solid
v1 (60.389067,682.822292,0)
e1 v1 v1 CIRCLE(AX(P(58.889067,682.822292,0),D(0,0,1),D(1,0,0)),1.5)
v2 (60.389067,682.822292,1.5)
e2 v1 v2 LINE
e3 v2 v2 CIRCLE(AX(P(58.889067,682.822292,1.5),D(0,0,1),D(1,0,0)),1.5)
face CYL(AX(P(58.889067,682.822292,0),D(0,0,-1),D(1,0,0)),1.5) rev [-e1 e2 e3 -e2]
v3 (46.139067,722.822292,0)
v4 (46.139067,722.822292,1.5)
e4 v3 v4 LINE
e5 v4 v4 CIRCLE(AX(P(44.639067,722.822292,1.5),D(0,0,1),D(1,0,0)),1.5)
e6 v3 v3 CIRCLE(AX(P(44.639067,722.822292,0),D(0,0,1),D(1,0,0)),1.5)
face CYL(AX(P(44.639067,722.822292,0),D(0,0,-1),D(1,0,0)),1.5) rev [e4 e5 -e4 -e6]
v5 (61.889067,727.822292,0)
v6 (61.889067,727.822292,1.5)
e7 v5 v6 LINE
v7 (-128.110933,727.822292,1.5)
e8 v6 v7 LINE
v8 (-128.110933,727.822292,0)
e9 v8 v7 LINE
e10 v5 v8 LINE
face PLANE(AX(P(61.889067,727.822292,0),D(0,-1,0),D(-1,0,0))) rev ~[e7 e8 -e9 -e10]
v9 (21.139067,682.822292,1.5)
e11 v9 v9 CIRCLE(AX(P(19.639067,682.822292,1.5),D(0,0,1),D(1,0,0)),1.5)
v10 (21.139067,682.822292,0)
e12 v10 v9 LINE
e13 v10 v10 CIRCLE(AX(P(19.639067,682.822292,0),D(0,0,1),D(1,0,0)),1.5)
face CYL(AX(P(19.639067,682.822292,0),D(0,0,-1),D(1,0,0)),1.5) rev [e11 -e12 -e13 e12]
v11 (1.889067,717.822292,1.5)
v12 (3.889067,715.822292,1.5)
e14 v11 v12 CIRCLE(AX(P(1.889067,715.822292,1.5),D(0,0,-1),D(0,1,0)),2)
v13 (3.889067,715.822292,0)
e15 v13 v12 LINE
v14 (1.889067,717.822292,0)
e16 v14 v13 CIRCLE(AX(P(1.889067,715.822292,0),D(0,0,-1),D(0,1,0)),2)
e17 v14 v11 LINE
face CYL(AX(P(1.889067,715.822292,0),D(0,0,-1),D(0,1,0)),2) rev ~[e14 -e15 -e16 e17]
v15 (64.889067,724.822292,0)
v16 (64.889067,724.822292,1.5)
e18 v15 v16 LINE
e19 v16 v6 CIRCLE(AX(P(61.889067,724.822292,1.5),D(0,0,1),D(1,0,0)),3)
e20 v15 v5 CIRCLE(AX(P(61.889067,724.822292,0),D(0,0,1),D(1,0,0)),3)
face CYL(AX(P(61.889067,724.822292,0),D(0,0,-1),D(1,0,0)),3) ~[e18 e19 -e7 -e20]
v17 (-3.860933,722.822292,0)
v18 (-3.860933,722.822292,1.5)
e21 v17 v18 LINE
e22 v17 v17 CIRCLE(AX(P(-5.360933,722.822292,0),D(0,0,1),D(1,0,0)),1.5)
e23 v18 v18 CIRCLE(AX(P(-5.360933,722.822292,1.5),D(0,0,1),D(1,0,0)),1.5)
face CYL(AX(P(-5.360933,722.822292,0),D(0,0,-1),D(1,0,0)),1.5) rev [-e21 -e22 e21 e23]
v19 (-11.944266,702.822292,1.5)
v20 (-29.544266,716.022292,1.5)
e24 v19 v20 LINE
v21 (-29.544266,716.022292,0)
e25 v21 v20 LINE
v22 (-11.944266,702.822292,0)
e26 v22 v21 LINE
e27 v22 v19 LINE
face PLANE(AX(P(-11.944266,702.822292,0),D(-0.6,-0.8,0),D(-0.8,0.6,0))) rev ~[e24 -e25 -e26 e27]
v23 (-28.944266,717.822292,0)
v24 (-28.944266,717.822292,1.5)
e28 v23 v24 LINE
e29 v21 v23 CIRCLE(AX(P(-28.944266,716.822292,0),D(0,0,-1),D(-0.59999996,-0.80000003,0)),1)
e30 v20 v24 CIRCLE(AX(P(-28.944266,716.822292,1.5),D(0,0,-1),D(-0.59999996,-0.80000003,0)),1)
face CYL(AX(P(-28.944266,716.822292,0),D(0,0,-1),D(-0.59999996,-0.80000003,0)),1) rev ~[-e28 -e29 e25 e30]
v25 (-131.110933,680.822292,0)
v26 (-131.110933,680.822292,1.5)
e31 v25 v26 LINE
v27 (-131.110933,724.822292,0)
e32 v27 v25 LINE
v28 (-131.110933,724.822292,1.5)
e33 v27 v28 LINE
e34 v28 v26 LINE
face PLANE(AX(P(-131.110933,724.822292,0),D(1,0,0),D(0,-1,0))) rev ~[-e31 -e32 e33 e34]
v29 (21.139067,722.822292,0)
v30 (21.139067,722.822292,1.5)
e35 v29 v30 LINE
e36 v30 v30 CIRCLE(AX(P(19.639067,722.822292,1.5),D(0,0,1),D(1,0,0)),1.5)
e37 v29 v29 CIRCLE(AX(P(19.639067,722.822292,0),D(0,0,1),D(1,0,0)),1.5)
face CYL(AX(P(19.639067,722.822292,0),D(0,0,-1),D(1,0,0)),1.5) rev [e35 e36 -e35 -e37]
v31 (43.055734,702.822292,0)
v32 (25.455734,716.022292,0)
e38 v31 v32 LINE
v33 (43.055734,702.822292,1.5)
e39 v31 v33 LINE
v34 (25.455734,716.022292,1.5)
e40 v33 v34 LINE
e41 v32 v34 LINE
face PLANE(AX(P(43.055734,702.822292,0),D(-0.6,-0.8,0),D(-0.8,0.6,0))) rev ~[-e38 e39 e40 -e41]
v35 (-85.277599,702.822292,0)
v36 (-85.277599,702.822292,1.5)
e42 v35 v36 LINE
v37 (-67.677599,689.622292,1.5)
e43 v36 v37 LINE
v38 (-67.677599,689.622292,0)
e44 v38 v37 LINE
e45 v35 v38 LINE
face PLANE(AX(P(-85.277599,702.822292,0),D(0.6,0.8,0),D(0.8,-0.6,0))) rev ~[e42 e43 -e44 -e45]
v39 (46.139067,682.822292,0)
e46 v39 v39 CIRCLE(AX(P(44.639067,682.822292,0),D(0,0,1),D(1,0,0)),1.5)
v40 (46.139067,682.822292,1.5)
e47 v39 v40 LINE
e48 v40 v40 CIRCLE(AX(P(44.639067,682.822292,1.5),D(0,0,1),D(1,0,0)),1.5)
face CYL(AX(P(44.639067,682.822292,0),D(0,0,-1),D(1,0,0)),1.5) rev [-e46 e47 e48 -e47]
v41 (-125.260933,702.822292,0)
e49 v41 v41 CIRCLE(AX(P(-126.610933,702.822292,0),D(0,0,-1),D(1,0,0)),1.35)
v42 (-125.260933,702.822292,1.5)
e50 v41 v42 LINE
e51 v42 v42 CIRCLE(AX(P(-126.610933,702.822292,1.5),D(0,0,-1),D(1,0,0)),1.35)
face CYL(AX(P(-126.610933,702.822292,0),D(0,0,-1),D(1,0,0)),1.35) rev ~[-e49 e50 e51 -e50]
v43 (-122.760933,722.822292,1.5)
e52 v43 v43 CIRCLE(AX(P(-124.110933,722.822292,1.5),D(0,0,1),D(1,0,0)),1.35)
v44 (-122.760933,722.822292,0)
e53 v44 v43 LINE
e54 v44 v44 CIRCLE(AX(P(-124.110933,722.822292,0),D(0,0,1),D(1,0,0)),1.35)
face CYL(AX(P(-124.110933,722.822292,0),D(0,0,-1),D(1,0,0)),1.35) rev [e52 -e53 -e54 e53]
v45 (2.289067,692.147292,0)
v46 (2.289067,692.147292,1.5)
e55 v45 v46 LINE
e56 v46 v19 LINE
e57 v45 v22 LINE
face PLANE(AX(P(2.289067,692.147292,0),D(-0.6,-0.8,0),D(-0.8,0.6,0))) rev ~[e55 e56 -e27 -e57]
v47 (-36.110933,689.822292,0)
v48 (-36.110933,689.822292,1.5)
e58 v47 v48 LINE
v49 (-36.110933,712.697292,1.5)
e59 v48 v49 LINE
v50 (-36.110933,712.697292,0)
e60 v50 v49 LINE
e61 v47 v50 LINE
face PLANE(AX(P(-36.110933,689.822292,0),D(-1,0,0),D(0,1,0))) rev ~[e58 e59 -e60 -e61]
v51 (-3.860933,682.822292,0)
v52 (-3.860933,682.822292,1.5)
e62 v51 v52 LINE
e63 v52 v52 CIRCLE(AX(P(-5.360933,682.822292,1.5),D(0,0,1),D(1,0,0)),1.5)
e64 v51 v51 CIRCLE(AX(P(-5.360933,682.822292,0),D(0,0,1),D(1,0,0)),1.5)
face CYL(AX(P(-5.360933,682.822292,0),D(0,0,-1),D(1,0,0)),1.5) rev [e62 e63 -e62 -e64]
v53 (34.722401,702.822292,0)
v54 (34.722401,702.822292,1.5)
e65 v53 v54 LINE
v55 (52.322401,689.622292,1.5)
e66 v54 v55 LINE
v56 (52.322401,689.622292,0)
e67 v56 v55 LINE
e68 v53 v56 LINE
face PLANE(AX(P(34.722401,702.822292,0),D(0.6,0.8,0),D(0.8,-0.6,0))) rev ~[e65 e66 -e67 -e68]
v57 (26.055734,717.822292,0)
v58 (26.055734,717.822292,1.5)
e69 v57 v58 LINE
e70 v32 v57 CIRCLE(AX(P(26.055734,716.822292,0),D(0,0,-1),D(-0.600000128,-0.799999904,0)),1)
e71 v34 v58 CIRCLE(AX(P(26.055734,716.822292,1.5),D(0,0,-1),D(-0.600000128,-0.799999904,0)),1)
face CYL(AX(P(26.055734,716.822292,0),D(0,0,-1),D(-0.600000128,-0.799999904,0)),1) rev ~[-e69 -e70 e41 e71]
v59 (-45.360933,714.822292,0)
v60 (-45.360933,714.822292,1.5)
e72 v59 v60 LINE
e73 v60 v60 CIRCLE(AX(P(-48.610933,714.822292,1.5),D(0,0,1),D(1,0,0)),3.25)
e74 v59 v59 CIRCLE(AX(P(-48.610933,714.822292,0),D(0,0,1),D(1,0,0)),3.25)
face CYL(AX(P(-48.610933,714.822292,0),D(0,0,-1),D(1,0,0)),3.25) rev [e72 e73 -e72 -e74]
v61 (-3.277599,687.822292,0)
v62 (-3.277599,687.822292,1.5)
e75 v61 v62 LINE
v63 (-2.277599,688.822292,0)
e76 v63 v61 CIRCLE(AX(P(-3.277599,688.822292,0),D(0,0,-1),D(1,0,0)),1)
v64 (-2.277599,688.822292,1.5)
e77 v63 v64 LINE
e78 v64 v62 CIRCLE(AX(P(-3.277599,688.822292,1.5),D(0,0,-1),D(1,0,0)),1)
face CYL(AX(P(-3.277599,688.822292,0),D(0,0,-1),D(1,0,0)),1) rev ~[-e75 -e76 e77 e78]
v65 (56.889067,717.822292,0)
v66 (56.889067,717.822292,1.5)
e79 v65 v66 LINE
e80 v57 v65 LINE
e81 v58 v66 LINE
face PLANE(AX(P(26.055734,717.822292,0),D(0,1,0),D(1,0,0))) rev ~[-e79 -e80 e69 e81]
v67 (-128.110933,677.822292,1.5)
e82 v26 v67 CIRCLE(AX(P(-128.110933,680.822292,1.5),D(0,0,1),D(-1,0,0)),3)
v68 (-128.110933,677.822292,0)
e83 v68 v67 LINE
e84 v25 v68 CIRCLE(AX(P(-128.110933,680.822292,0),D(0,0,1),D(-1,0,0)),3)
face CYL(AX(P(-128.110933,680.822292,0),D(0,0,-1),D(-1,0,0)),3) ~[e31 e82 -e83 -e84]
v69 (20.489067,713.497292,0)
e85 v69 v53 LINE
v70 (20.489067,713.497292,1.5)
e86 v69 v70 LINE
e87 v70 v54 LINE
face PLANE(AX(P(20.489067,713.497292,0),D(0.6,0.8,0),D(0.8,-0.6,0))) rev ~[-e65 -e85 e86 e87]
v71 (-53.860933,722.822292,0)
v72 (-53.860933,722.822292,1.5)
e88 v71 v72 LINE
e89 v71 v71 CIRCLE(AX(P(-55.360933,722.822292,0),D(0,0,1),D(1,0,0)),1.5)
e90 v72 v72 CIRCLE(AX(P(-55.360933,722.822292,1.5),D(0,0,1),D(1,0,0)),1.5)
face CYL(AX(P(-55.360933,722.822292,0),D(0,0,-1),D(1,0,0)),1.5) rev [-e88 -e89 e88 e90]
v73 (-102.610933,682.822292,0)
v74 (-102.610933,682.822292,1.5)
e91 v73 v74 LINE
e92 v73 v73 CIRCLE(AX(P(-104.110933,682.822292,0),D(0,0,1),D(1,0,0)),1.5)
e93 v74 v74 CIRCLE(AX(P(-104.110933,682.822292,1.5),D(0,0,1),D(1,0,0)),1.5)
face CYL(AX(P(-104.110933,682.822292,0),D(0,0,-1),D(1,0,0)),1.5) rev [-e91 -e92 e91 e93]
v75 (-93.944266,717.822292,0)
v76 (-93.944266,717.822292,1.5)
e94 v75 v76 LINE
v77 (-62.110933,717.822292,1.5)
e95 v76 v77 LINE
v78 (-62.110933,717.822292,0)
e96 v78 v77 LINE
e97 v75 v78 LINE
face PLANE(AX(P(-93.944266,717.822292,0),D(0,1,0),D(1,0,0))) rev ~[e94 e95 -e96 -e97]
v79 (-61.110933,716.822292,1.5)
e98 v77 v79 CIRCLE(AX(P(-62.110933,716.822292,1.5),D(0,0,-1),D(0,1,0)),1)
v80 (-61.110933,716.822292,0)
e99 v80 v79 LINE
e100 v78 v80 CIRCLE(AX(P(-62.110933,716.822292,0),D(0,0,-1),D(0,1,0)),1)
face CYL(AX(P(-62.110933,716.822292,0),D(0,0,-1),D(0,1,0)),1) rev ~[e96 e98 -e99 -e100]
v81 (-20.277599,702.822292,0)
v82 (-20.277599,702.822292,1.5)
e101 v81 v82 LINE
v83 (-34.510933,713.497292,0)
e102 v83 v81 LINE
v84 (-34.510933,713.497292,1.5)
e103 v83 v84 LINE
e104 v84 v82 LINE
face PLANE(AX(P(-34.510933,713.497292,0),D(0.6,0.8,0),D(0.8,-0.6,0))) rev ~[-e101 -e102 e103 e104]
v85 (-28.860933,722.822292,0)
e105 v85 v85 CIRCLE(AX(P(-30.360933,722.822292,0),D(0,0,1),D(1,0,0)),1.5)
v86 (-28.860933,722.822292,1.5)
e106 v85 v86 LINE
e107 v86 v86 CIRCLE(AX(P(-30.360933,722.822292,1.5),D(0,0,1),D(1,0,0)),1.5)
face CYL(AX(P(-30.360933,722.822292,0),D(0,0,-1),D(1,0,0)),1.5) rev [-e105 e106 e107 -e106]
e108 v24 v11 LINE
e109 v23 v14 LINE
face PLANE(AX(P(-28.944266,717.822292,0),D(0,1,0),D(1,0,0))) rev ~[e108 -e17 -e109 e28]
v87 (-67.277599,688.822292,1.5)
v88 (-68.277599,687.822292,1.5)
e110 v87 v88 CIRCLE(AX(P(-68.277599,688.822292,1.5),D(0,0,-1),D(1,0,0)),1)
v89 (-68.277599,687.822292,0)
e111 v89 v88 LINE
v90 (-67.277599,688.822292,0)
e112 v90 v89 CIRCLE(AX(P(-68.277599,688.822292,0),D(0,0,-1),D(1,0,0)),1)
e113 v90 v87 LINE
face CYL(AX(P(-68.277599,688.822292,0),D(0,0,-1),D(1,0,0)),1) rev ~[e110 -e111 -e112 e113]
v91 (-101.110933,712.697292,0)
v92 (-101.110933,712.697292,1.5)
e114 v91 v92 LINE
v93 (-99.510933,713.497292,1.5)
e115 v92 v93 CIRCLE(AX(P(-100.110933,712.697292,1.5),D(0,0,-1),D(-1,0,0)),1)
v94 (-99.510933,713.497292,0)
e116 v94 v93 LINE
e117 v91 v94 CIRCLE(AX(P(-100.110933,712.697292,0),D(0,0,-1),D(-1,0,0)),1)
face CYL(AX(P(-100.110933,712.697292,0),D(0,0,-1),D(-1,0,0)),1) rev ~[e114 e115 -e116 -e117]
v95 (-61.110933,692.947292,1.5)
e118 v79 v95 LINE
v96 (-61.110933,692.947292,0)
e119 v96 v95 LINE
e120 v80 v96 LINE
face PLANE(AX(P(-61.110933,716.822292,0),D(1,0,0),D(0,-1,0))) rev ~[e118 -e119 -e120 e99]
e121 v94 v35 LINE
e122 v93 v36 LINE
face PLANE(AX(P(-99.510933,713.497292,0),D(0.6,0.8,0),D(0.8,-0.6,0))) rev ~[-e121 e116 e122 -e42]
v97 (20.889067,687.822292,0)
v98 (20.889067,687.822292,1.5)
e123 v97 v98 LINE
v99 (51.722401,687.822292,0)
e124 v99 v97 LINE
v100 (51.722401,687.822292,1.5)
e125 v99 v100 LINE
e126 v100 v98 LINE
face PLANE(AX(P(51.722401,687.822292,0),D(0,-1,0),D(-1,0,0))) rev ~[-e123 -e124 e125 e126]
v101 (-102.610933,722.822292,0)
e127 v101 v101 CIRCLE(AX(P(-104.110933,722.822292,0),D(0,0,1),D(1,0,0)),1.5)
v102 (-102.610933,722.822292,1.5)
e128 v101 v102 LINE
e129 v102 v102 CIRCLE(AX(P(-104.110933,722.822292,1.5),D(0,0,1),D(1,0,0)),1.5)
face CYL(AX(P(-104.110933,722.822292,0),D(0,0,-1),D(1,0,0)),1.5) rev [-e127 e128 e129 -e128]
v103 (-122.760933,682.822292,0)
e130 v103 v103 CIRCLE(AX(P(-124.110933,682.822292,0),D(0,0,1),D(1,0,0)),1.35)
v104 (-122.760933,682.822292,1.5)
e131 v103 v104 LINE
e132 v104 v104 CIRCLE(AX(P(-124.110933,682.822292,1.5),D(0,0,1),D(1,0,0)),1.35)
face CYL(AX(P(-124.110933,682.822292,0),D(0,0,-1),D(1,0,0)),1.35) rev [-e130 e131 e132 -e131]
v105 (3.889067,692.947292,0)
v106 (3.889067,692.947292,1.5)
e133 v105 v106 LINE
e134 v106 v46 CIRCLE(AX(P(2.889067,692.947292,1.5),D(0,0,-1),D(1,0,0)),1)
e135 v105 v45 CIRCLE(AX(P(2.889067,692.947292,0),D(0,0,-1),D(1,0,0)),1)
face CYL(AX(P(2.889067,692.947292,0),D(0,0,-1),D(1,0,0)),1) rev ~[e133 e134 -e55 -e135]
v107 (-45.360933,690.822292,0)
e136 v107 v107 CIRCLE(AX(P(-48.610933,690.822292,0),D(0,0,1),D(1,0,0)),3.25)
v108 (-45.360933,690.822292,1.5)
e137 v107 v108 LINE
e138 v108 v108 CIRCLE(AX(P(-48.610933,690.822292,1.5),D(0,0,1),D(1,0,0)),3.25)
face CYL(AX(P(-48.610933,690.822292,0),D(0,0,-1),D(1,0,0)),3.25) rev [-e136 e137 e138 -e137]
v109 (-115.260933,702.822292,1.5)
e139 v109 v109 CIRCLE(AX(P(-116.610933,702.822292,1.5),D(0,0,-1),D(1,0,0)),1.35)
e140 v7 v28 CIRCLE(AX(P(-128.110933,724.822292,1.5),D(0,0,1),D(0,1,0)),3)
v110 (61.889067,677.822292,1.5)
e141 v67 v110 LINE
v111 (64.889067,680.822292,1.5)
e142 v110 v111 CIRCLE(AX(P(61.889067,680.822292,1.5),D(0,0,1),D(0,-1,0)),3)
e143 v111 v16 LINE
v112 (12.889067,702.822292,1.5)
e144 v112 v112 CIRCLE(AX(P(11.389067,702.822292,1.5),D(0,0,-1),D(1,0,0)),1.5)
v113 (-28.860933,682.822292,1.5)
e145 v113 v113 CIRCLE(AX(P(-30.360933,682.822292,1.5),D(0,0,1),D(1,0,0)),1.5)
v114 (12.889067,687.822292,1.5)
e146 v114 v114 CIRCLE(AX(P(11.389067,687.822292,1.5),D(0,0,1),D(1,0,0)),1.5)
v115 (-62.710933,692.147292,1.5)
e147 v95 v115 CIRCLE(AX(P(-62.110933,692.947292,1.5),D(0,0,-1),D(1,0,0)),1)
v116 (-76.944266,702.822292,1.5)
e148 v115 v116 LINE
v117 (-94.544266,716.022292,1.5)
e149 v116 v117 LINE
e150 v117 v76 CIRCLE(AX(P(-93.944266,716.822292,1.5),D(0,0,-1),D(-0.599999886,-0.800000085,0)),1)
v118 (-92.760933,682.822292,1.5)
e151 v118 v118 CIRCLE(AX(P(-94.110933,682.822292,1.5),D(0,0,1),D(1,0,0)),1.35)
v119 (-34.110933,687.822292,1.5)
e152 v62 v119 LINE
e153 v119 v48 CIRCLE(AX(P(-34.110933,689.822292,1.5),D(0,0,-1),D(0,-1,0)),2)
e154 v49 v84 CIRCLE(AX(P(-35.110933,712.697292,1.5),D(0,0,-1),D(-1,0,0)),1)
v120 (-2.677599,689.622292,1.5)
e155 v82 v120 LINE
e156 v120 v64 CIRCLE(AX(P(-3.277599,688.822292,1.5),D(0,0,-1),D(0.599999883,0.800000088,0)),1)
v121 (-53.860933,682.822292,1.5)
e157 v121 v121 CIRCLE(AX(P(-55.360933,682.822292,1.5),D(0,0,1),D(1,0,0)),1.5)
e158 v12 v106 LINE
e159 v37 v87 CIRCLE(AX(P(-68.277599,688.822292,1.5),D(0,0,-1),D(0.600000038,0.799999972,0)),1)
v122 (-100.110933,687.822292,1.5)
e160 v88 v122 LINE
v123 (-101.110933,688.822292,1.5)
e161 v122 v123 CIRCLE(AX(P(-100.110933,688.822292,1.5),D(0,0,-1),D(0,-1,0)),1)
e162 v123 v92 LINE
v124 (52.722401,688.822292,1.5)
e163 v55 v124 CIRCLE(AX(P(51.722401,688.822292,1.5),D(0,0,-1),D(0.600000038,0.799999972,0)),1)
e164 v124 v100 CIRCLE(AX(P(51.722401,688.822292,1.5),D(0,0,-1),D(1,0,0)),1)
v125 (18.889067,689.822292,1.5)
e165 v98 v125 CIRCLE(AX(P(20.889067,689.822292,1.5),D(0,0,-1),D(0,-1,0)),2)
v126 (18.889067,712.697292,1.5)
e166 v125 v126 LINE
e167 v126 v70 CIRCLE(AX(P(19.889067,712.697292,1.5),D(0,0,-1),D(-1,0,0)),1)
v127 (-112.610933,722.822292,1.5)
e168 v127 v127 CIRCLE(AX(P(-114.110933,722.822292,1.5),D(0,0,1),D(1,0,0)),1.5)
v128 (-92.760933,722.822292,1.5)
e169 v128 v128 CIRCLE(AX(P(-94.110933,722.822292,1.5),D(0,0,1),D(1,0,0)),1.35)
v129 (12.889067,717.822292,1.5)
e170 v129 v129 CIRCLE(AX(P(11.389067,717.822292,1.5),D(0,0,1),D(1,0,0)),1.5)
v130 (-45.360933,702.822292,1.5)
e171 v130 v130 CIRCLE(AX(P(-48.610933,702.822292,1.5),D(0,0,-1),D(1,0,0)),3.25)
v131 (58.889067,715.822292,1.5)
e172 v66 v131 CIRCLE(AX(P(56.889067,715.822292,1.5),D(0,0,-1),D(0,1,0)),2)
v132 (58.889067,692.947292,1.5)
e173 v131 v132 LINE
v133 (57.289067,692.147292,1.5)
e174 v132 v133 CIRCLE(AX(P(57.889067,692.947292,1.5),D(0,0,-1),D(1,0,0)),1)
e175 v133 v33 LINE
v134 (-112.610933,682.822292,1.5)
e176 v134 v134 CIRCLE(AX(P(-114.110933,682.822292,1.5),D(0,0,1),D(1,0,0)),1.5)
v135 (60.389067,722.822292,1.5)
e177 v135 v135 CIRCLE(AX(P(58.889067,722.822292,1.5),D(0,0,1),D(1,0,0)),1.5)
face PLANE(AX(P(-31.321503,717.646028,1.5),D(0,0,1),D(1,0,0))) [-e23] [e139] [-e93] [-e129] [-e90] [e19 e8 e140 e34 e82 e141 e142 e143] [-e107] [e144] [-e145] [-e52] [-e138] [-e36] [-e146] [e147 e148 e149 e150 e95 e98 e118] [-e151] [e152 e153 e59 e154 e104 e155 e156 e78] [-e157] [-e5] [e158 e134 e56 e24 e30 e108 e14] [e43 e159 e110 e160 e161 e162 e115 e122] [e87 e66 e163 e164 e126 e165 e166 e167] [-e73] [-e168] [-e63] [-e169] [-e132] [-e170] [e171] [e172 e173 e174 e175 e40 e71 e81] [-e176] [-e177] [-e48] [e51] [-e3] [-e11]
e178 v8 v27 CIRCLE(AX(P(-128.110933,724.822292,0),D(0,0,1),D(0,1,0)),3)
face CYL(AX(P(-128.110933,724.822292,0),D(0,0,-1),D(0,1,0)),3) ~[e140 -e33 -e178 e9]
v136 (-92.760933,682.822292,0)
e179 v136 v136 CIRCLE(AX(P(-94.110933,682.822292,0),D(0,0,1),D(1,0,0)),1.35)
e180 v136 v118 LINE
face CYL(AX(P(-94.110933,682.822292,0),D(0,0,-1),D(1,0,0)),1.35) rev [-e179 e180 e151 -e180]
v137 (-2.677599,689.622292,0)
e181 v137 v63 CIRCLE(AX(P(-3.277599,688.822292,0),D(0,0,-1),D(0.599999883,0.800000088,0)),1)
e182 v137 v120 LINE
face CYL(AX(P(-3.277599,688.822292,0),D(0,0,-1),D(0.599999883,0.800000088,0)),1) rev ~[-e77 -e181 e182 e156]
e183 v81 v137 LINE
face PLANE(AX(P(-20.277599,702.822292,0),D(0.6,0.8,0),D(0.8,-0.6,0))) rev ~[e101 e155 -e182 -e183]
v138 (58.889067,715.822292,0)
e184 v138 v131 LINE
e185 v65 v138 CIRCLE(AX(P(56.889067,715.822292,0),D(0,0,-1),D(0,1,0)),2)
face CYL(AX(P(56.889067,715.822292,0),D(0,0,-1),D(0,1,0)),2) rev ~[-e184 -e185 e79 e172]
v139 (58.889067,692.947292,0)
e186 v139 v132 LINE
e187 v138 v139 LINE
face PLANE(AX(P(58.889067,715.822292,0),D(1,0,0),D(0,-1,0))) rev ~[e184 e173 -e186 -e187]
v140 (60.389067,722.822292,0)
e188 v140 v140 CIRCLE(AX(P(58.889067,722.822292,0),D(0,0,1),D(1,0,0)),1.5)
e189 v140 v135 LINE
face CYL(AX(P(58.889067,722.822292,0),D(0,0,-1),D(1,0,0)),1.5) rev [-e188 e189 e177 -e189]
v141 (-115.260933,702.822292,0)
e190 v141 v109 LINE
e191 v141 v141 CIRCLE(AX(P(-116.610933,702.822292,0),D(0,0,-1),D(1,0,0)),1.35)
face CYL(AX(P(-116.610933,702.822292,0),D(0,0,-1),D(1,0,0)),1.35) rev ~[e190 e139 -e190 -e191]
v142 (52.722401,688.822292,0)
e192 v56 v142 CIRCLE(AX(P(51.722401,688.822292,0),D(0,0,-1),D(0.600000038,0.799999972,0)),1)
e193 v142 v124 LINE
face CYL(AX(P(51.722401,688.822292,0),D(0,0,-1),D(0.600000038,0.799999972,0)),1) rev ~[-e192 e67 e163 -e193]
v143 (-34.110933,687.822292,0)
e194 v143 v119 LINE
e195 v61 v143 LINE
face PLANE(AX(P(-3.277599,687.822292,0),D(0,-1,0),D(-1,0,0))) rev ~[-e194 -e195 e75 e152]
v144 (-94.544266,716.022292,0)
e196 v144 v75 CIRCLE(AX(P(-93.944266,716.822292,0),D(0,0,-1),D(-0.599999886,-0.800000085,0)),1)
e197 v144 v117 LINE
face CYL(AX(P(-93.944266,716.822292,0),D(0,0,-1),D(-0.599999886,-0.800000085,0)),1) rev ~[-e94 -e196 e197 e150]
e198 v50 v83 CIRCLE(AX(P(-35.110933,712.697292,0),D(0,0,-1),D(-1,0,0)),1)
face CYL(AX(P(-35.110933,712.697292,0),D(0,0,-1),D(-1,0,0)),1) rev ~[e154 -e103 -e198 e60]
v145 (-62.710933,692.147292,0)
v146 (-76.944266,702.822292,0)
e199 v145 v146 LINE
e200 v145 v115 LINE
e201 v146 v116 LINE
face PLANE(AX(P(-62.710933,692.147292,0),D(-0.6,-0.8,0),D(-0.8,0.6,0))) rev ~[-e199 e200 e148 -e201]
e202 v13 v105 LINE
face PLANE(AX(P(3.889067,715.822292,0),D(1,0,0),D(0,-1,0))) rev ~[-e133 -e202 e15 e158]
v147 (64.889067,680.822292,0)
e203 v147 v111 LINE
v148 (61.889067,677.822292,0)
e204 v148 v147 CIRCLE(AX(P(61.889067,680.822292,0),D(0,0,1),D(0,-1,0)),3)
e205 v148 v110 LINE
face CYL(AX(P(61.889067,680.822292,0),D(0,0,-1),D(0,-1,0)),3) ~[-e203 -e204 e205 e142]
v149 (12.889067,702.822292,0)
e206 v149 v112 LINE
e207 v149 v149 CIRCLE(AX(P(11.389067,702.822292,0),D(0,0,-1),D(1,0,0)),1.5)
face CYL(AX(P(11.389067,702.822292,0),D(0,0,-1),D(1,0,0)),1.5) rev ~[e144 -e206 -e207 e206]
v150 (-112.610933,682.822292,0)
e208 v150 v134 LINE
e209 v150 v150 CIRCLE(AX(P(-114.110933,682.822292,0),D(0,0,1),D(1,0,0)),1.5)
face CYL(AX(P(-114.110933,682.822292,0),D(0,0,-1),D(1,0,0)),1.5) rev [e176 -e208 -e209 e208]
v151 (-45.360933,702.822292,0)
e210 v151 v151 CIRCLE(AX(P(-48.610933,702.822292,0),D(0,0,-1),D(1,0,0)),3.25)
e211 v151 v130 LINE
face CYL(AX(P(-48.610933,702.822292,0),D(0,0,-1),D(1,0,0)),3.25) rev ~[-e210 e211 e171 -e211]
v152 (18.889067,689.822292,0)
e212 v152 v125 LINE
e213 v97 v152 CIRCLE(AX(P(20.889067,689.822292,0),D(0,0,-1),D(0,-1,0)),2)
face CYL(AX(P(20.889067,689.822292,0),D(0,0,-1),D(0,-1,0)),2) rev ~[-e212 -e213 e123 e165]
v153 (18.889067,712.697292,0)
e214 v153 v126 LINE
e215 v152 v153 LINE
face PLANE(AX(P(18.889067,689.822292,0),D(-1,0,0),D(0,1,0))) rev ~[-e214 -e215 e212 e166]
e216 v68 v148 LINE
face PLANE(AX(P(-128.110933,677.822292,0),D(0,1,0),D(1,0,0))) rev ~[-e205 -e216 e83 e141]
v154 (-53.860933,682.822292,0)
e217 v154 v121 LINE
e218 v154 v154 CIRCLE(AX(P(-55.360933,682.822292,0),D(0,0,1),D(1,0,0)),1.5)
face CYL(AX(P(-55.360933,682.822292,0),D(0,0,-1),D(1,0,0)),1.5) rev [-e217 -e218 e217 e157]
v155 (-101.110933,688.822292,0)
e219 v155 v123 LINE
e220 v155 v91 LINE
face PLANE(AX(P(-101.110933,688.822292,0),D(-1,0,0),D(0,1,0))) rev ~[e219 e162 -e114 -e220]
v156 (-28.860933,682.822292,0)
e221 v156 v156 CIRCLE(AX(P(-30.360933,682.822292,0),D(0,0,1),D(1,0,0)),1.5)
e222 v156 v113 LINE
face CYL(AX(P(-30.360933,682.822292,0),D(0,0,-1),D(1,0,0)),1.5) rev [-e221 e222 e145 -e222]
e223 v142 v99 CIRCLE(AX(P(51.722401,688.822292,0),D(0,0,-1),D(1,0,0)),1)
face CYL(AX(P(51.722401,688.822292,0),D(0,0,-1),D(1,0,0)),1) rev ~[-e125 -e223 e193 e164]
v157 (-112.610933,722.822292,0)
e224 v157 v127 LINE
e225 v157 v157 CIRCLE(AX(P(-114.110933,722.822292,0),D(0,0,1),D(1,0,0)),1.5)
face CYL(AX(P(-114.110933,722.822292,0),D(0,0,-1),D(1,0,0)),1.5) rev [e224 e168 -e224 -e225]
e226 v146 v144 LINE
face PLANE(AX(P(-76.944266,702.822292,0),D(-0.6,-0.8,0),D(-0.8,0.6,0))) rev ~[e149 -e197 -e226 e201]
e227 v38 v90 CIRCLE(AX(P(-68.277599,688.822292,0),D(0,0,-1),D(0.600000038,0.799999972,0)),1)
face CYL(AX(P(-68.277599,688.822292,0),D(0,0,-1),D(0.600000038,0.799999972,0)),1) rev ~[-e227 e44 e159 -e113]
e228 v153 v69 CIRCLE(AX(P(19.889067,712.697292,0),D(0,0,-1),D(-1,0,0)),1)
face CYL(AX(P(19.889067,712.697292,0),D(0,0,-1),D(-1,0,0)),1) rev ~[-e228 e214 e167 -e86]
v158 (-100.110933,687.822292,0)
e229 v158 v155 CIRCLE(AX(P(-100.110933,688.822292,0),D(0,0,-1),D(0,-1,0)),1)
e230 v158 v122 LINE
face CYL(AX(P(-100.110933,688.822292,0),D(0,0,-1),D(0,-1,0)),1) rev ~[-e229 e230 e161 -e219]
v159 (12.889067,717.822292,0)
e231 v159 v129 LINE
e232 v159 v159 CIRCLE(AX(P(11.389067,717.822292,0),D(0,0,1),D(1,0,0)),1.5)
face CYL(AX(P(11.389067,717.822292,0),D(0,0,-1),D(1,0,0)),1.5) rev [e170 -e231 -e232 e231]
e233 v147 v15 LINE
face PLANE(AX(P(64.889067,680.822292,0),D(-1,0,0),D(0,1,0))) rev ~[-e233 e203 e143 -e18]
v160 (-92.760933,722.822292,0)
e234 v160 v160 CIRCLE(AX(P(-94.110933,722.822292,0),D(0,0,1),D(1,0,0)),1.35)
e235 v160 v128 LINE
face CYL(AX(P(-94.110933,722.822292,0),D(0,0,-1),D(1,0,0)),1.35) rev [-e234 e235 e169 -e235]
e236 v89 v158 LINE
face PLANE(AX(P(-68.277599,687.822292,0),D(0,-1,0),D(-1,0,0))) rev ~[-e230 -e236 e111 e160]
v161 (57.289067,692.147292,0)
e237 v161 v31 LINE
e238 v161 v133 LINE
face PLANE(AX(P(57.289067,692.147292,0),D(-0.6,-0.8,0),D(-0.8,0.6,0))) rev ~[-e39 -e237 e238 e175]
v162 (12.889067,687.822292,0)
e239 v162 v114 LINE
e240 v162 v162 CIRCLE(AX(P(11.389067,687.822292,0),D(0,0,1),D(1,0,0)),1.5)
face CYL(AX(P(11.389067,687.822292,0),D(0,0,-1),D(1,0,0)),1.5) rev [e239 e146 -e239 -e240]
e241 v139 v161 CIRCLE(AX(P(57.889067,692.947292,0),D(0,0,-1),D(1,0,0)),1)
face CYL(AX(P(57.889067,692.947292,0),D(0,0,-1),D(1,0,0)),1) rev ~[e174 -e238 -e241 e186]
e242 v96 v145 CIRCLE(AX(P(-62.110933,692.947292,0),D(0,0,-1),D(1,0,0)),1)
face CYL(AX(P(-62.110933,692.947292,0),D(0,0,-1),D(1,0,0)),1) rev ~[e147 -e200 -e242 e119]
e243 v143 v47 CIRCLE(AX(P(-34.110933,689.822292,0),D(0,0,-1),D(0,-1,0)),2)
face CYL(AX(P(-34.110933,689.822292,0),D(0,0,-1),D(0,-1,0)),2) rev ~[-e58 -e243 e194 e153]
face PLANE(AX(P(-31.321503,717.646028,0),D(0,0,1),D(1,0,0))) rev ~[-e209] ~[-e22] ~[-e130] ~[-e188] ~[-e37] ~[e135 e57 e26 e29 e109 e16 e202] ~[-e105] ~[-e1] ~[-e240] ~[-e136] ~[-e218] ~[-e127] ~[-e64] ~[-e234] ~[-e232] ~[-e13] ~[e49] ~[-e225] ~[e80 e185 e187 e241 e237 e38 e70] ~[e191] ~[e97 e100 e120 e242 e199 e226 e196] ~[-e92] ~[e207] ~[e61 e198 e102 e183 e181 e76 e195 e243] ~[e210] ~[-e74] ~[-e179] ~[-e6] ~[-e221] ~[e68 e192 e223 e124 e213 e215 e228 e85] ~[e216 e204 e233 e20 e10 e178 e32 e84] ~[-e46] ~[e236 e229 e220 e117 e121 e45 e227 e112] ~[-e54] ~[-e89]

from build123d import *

# Parameters (mm, degrees)
F0_R     = 3.25
F0_R_2   = 1.35
F0_R_3   = 1.5
F1_DEPTH = 1.5


# Not quite as in the source:
# - a feature names something its author has since deleted; it is built from what else it names


with BuildPart() as f1:
    # F0 (on Top) → F1 (new body)
    with BuildSketch(Plane.XY):
        with BuildLine():
            Line((61.8890674149, 727.822291851), (-128.1109325851, 727.822291851))
            ThreePointArc((-128.1109325851, 727.822291851), (-130.2322529287, 726.9436121946), (-131.1109325851, 724.822291851))
            Line((-131.1109325851, 724.822291851), (-131.1109325851, 702.822291851))
            Line((-131.1109325851, 702.822291851), (-127.9609325851, 702.822291851))
            ThreePointArc((-127.9609325851, 702.822291851), (-126.6109325851, 704.172291851), (-125.2609325851, 702.822291851))
            Line((-125.2609325851, 702.822291851), (-117.9609325851, 702.822291851))
            ThreePointArc((-117.9609325851, 702.822291851), (-116.6109325851, 704.172291851), (-115.2609325851, 702.822291851))
            Line((-115.2609325851, 702.822291851), (-101.1109325851, 702.822291851))
            Line((-101.1109325851, 702.822291851), (-101.1109325851, 712.697291851))
            Line((-101.1109325851, 712.697291851), (-101.1109325851, 714.697291851))
            Line((-101.1109325851, 714.697291851), (-101.1109325851, 714.822291851))
            ThreePointArc((-101.1109325851, 714.822291851), (-100.8472193445, 716.0522246827), (-100.1024427382, 717.0659244658))
            ThreePointArc((-100.1024427382, 717.0659244658), (-99.1760856623, 717.6268326195), (-98.1109325851, 717.822291851))
            Line((-98.1109325851, 717.822291851), (-96.9442659185, 717.822291851))
            Line((-96.9442659185, 717.822291851), (-93.9442659185, 717.822291851))
            Line((-93.9442659185, 717.822291851), (-62.1109325851, 717.822291851))
            ThreePointArc((-62.1109325851, 717.822291851), (-61.403825804, 717.5293986322), (-61.1109325851, 716.822291851))
            Line((-61.1109325851, 716.822291851), (-61.1109325851, 702.822291851))
            Line((-61.1109325851, 702.822291851), (-51.8609325851, 702.822291851))
            ThreePointArc((-51.8609325851, 702.822291851), (-48.6109325851, 706.072291851), (-45.3609325851, 702.822291851))
            Line((-45.3609325851, 702.822291851), (-36.1109325851, 702.822291851))
            Line((-36.1109325851, 702.822291851), (-36.1109325851, 712.697291851))
            Line((-36.1109325851, 712.697291851), (-36.1109325851, 714.697291851))
            Line((-36.1109325851, 714.697291851), (-36.1109325851, 715.822291851))
            ThreePointArc((-36.1109325851, 715.822291851), (-35.9351237581, 716.6422470721), (-35.4386060205, 717.3180469276))
            ThreePointArc((-35.4386060205, 717.3180469276), (-34.8210346366, 717.6919856967), (-34.1109325851, 717.822291851))
            Line((-34.1109325851, 717.822291851), (-31.9442659185, 717.822291851))
            Line((-31.9442659185, 717.822291851), (-28.9442659185, 717.822291851))
            Line((-28.9442659185, 717.822291851), (1.8890674149, 717.822291851))
            ThreePointArc((1.8890674149, 717.822291851), (3.3032809772, 717.2365054134), (3.8890674149, 715.822291851))
            Line((3.8890674149, 715.822291851), (3.8890674149, 702.822291851))
            Line((3.8890674149, 702.822291851), (9.8890674149, 702.822291851))
            ThreePointArc((9.8890674149, 702.822291851), (11.3890674149, 704.322291851), (12.8890674149, 702.822291851))
            Line((12.8890674149, 702.822291851), (18.8890674149, 702.822291851))
            Line((18.8890674149, 702.822291851), (18.8890674149, 712.697291851))
            Line((18.8890674149, 712.697291851), (18.8890674149, 714.697291851))
            Line((18.8890674149, 714.697291851), (18.8890674149, 715.822291851))
            ThreePointArc((18.8890674149, 715.822291851), (19.0648762419, 716.6422470721), (19.5613939795, 717.3180469276))
            ThreePointArc((19.5613939795, 717.3180469276), (20.1789653634, 717.6919856967), (20.8890674149, 717.822291851))
            Line((20.8890674149, 717.822291851), (23.0557340815, 717.822291851))
            Line((23.0557340815, 717.822291851), (26.0557340815, 717.822291851))
            Line((26.0557340815, 717.822291851), (56.8890674149, 717.822291851))
            ThreePointArc((56.8890674149, 717.822291851), (58.3032809772, 717.2365054134), (58.8890674149, 715.822291851))
            Line((58.8890674149, 715.822291851), (58.8890674149, 702.822291851))
            Line((58.8890674149, 702.822291851), (64.8890674149, 702.822291851))
            Line((64.8890674149, 702.822291851), (64.8890674149, 724.822291851))
            ThreePointArc((64.8890674149, 724.822291851), (64.0103877584, 726.9436121946), (61.8890674149, 727.822291851))
        make_face()
        with Locations((-48.6109325851, 714.822291851)):
            Circle(F0_R, mode=Mode.SUBTRACT)
        with Locations((-124.1109325851, 722.822291851)):
            Circle(F0_R_2, mode=Mode.SUBTRACT)
        with Locations((-114.1109325851, 722.822291851)):
            Circle(F0_R_3, mode=Mode.SUBTRACT)
        with Locations((-104.1109325851, 722.822291851)):
            Circle(F0_R_3, mode=Mode.SUBTRACT)
        with Locations((-94.1109325851, 722.822291851)):
            Circle(F0_R_2, mode=Mode.SUBTRACT)
        with Locations((-55.3609325851, 722.822291851)):
            Circle(F0_R_3, mode=Mode.SUBTRACT)
        with Locations((11.3890674149, 717.822291851)):
            Circle(F0_R_3, mode=Mode.SUBTRACT)
        with Locations((-30.3609325851, 722.822291851)):
            Circle(F0_R_3, mode=Mode.SUBTRACT)
        with Locations((-5.3609325851, 722.822291851)):
            Circle(F0_R_3, mode=Mode.SUBTRACT)
        with Locations((19.6390674149, 722.822291851)):
            Circle(F0_R_3, mode=Mode.SUBTRACT)
        with Locations((23.8890674149, 722.822291851)):
            Circle(F0_R_3, mode=Mode.SUBTRACT)
        with Locations((44.6390674149, 722.822291851)):
            Circle(F0_R_3, mode=Mode.SUBTRACT)
        with Locations((58.8890674149, 722.822291851)):
            Circle(F0_R_3, mode=Mode.SUBTRACT)
        with BuildLine():
            Line((-127.9609325851, 702.822291851), (-131.1109325851, 702.822291851))
            Line((-131.1109325851, 702.822291851), (-131.1109325851, 680.822291851))
            ThreePointArc((-131.1109325851, 680.822291851), (-130.2322529287, 678.7009715075), (-128.1109325851, 677.822291851))
            Line((-128.1109325851, 677.822291851), (61.8890674149, 677.822291851))
            ThreePointArc((61.8890674149, 677.822291851), (64.0103877584, 678.7009715075), (64.8890674149, 680.822291851))
            Line((64.8890674149, 680.822291851), (64.8890674149, 702.822291851))
            Line((64.8890674149, 702.822291851), (58.8890674149, 702.822291851))
            Line((58.8890674149, 702.822291851), (58.8890674149, 692.947291851))
            Line((58.8890674149, 692.947291851), (58.8890674149, 690.947291851))
            Line((58.8890674149, 690.947291851), (58.8890674149, 689.822291851))
            ThreePointArc((58.8890674149, 689.822291851), (58.7132585878, 689.0023366299), (58.2167408502, 688.3265367745))
            ThreePointArc((58.2167408502, 688.3265367745), (57.5991694663, 687.9525980054), (56.8890674149, 687.822291851))
            Line((56.8890674149, 687.822291851), (54.7224007482, 687.822291851))
            Line((54.7224007482, 687.822291851), (51.7224007482, 687.822291851))
            Line((51.7224007482, 687.822291851), (20.8890674149, 687.822291851))
            ThreePointArc((20.8890674149, 687.822291851), (19.4748538525, 688.4080782887), (18.8890674149, 689.822291851))
            Line((18.8890674149, 689.822291851), (18.8890674149, 702.822291851))
            Line((18.8890674149, 702.822291851), (12.8890674149, 702.822291851))
            ThreePointArc((12.8890674149, 702.822291851), (11.3890674149, 701.322291851), (9.8890674149, 702.822291851))
            Line((9.8890674149, 702.822291851), (3.8890674149, 702.822291851))
            Line((3.8890674149, 702.822291851), (3.8890674149, 692.947291851))
            Line((3.8890674149, 692.947291851), (3.8890674149, 690.947291851))
            Line((3.8890674149, 690.947291851), (3.8890674149, 689.822291851))
            ThreePointArc((3.8890674149, 689.822291851), (3.7132585878, 689.0023366299), (3.2167408502, 688.3265367745))
            ThreePointArc((3.2167408502, 688.3265367745), (2.5991694663, 687.9525980054), (1.8890674149, 687.822291851))
            Line((1.8890674149, 687.822291851), (-0.2775992518, 687.822291851))
            Line((-0.2775992518, 687.822291851), (-3.2775992518, 687.822291851))
            Line((-3.2775992518, 687.822291851), (-34.1109325851, 687.822291851))
            ThreePointArc((-34.1109325851, 687.822291851), (-35.5251461475, 688.4080782887), (-36.1109325851, 689.822291851))
            Line((-36.1109325851, 689.822291851), (-36.1109325851, 702.822291851))
            Line((-36.1109325851, 702.822291851), (-45.3609325851, 702.822291851))
            ThreePointArc((-45.3609325851, 702.822291851), (-48.6109325851, 699.572291851), (-51.8609325851, 702.822291851))
            Line((-51.8609325851, 702.822291851), (-61.1109325851, 702.822291851))
            Line((-61.1109325851, 702.822291851), (-61.1109325851, 692.947291851))
            Line((-61.1109325851, 692.947291851), (-61.1109325851, 690.947291851))
            Line((-61.1109325851, 690.947291851), (-61.1109325851, 690.822291851))
            ThreePointArc((-61.1109325851, 690.822291851), (-61.3746458258, 689.5923590194), (-62.1194224321, 688.5786592362))
            ThreePointArc((-62.1194224321, 688.5786592362), (-63.045779508, 688.0177510825), (-64.1109325851, 687.822291851))
            Line((-64.1109325851, 687.822291851), (-65.2775992518, 687.822291851))
            Line((-65.2775992518, 687.822291851), (-68.2775992518, 687.822291851))
            Line((-68.2775992518, 687.822291851), (-100.1109325851, 687.822291851))
            ThreePointArc((-100.1109325851, 687.822291851), (-100.8180393663, 688.1151850699), (-101.1109325851, 688.822291851))
            Line((-101.1109325851, 688.822291851), (-101.1109325851, 702.822291851))
            Line((-101.1109325851, 702.822291851), (-115.2609325851, 702.822291851))
            ThreePointArc((-115.2609325851, 702.822291851), (-116.6109325851, 701.472291851), (-117.9609325851, 702.822291851))
            Line((-117.9609325851, 702.822291851), (-125.2609325851, 702.822291851))
            ThreePointArc((-125.2609325851, 702.822291851), (-126.6109325851, 701.472291851), (-127.9609325851, 702.822291851))
        make_face()
        with Locations((-124.1109325851, 682.822291851)):
            Circle(F0_R_2, mode=Mode.SUBTRACT)
        with Locations((-114.1109325851, 682.822291851)):
            Circle(F0_R_3, mode=Mode.SUBTRACT)
        with Locations((-104.1109325851, 682.822291851)):
            Circle(F0_R_3, mode=Mode.SUBTRACT)
        with Locations((-94.1109325851, 682.822291851)):
            Circle(F0_R_2, mode=Mode.SUBTRACT)
        with Locations((-55.3609325851, 682.822291851)):
            Circle(F0_R_3, mode=Mode.SUBTRACT)
        with Locations((-48.6109325851, 690.822291851)):
            Circle(F0_R, mode=Mode.SUBTRACT)
        with Locations((-30.3609325851, 682.822291851)):
            Circle(F0_R_3, mode=Mode.SUBTRACT)
        with Locations((-5.3609325851, 682.822291851)):
            Circle(F0_R_3, mode=Mode.SUBTRACT)
        with Locations((11.3890674149, 687.822291851)):
            Circle(F0_R_3, mode=Mode.SUBTRACT)
        with Locations((19.6390674149, 682.822291851)):
            Circle(F0_R_3, mode=Mode.SUBTRACT)
        with Locations((23.8890674149, 682.822291851)):
            Circle(F0_R_3, mode=Mode.SUBTRACT)
        with Locations((44.6390674149, 682.822291851)):
            Circle(F0_R_3, mode=Mode.SUBTRACT)
        with Locations((58.8890674149, 682.822291851)):
            Circle(F0_R_3, mode=Mode.SUBTRACT)
        with Locations((23.8890674149, 722.822291851)):
            Circle(F0_R_3)
        with Locations((23.8890674149, 682.822291851)):
            Circle(F0_R_3)
        with BuildLine():
            Line((-99.5109326053, 713.4972918661), (-85.2775992518, 702.822291851))
            Line((-85.2775992518, 702.822291851), (-81.1109325851, 702.822291851))
            Line((-81.1109325851, 702.822291851), (-100.1024427382, 717.0659244658))
            ThreePointArc((-100.1024427382, 717.0659244658), (-100.8472193445, 716.0522246827), (-101.1109325851, 714.822291851))
            Line((-101.1109325851, 714.822291851), (-101.1109325851, 714.697291851))
            Line((-101.1109325851, 714.697291851), (-99.5109326053, 713.4972918661))
        make_face()
        with BuildLine():
            Line((-100.1024427382, 717.0659244658), (-81.1109325851, 702.822291851))
            Line((-81.1109325851, 702.822291851), (-76.9442659185, 702.822291851))
            Line((-76.9442659185, 702.822291851), (-94.5442658047, 716.0222917657))
            Line((-94.5442658047, 716.0222917657), (-96.9442659185, 717.822291851))
            Line((-96.9442659185, 717.822291851), (-98.1109325851, 717.822291851))
            ThreePointArc((-98.1109325851, 717.822291851), (-99.1760856623, 717.6268326195), (-100.1024427382, 717.0659244658))
        make_face()
        with BuildLine():
            Line((-76.9442659185, 702.822291851), (-81.1109325851, 702.822291851))
            Line((-81.1109325851, 702.822291851), (-62.1194224321, 688.5786592362))
            ThreePointArc((-62.1194224321, 688.5786592362), (-61.3746458258, 689.5923590194), (-61.1109325851, 690.822291851))
            Line((-61.1109325851, 690.822291851), (-61.1109325851, 690.947291851))
            Line((-61.1109325851, 690.947291851), (-62.7109326177, 692.1472918754))
            Line((-62.7109326177, 692.1472918754), (-76.9442659185, 702.822291851))
        make_face()
        with BuildLine():
            Line((-81.1109325851, 702.822291851), (-85.2775992518, 702.822291851))
            Line((-85.2775992518, 702.822291851), (-67.6775992141, 689.6222918227))
            Line((-67.6775992141, 689.6222918227), (-65.2775992518, 687.822291851))
            Line((-65.2775992518, 687.822291851), (-64.1109325851, 687.822291851))
            ThreePointArc((-64.1109325851, 687.822291851), (-63.045779508, 688.0177510825), (-62.1194224321, 688.5786592362))
            Line((-62.1194224321, 688.5786592362), (-81.1109325851, 702.822291851))
        make_face()
        with BuildLine():
            Line((-65.2775992518, 687.822291851), (-67.6775992141, 689.6222918227))
            ThreePointArc((-67.6775992141, 689.6222918227), (-67.3831720503, 689.2695054254), (-67.2775992518, 688.822291851))
            ThreePointArc((-67.2775992518, 688.822291851), (-67.5704924706, 688.1151850699), (-68.2775992518, 687.822291851))
            Line((-68.2775992518, 687.822291851), (-65.2775992518, 687.822291851))
        make_face()
        with BuildLine():
            Line((-96.9442659185, 717.822291851), (-94.5442658047, 716.0222917657))
            ThreePointArc((-94.5442658047, 716.0222917657), (-94.892949239, 717.1385195496), (-93.9442659185, 717.822291851))
            Line((-93.9442659185, 717.822291851), (-96.9442659185, 717.822291851))
        make_face()
        with BuildLine():
            Line((-16.1109325851, 702.822291851), (-11.9442659185, 702.822291851))
            Line((-11.9442659185, 702.822291851), (-29.5442658782, 716.0222918209))
            Line((-29.5442658782, 716.0222918209), (-31.9442659185, 717.822291851))
            Line((-31.9442659185, 717.822291851), (-34.1109325851, 717.822291851))
            ThreePointArc((-34.1109325851, 717.822291851), (-34.8210346366, 717.6919856967), (-35.4386060205, 717.3180469276))
            Line((-35.4386060205, 717.3180469276), (-16.1109325851, 702.822291851))
        make_face()
        with BuildLine():
            Line((-20.2775992518, 702.822291851), (-16.1109325851, 702.822291851))
            Line((-16.1109325851, 702.822291851), (-35.4386060205, 717.3180469276))
            ThreePointArc((-35.4386060205, 717.3180469276), (-35.9351237581, 716.6422470721), (-36.1109325851, 715.822291851))
            Line((-36.1109325851, 715.822291851), (-36.1109325851, 714.697291851))
            Line((-36.1109325851, 714.697291851), (-34.5109326989, 713.4972919364))
            Line((-34.5109326989, 713.4972919364), (-20.2775992518, 702.822291851))
        make_face()
        with BuildLine():
            Line((3.2167408502, 688.3265367745), (-16.1109325851, 702.822291851))
            Line((-16.1109325851, 702.822291851), (-20.2775992518, 702.822291851))
            Line((-20.2775992518, 702.822291851), (-2.6775993691, 689.622291939))
            Line((-2.6775993691, 689.622291939), (-0.2775992518, 687.822291851))
            Line((-0.2775992518, 687.822291851), (1.8890674149, 687.822291851))
            ThreePointArc((1.8890674149, 687.822291851), (2.5991694663, 687.9525980054), (3.2167408502, 688.3265367745))
        make_face()
        with BuildLine():
            Line((2.2890673807, 692.1472918767), (-11.9442659185, 702.822291851))
            Line((-11.9442659185, 702.822291851), (-16.1109325851, 702.822291851))
            Line((-16.1109325851, 702.822291851), (3.2167408502, 688.3265367745))
            ThreePointArc((3.2167408502, 688.3265367745), (3.7132585878, 689.0023366299), (3.8890674149, 689.822291851))
            Line((3.8890674149, 689.822291851), (3.8890674149, 690.947291851))
            Line((3.8890674149, 690.947291851), (2.2890673807, 692.1472918767))
        make_face()
        with BuildLine():
            Line((-0.2775992518, 687.822291851), (-2.6775993691, 689.622291939))
            ThreePointArc((-2.6775993691, 689.622291939), (-2.3831720936, 689.2695055121), (-2.2775992518, 688.822291851))
            ThreePointArc((-2.2775992518, 688.822291851), (-2.5704924706, 688.1151850699), (-3.2775992518, 687.822291851))
            Line((-3.2775992518, 687.822291851), (-0.2775992518, 687.822291851))
        make_face()
        with BuildLine():
            Line((3.8890674149, 690.947291851), (3.8890674149, 692.947291851))
            ThreePointArc((3.8890674149, 692.947291851), (3.3362809913, 692.0528646505), (2.2890673807, 692.1472918767))
            Line((2.2890673807, 692.1472918767), (3.8890674149, 690.947291851))
        make_face()
        with BuildLine():
            Line((-31.9442659185, 717.822291851), (-29.5442658782, 716.0222918209))
            ThreePointArc((-29.5442658782, 716.0222918209), (-29.8929492245, 717.1385195932), (-28.9442659185, 717.822291851))
            Line((-28.9442659185, 717.822291851), (-31.9442659185, 717.822291851))
        make_face()
        with BuildLine():
            ThreePointArc((-36.1109325851, 712.697291851), (-35.5581462443, 713.5917190102), (-34.5109326989, 713.4972919364))
            Line((-34.5109326989, 713.4972919364), (-36.1109325851, 714.697291851))
            Line((-36.1109325851, 714.697291851), (-36.1109325851, 712.697291851))
        make_face()
        with BuildLine():
            Line((34.7224007482, 702.822291851), (38.8890674149, 702.822291851))
            Line((38.8890674149, 702.822291851), (19.5613939795, 717.3180469276))
            ThreePointArc((19.5613939795, 717.3180469276), (19.0648762419, 716.6422470721), (18.8890674149, 715.822291851))
            Line((18.8890674149, 715.822291851), (18.8890674149, 714.697291851))
            Line((18.8890674149, 714.697291851), (20.4890673011, 713.4972919364))
            Line((20.4890673011, 713.4972919364), (34.7224007482, 702.822291851))
        make_face()
        with BuildLine():
            Line((38.8890674149, 702.822291851), (43.0557340815, 702.822291851))
            Line((43.0557340815, 702.822291851), (25.4557339533, 716.0222919472))
            Line((25.4557339533, 716.0222919472), (23.0557340815, 717.822291851))
            Line((23.0557340815, 717.822291851), (20.8890674149, 717.822291851))
            ThreePointArc((20.8890674149, 717.822291851), (20.1789653634, 717.6919856967), (19.5613939795, 717.3180469276))
            Line((19.5613939795, 717.3180469276), (38.8890674149, 702.822291851))
        make_face()
        with BuildLine():
            Line((58.2167408502, 688.3265367745), (38.8890674149, 702.822291851))
            Line((38.8890674149, 702.822291851), (34.7224007482, 702.822291851))
            Line((34.7224007482, 702.822291851), (52.3224007859, 689.6222918227))
            Line((52.3224007859, 689.6222918227), (54.7224007482, 687.822291851))
            Line((54.7224007482, 687.822291851), (56.8890674149, 687.822291851))
            ThreePointArc((56.8890674149, 687.822291851), (57.5991694663, 687.9525980054), (58.2167408502, 688.3265367745))
        make_face()
        with BuildLine():
            Line((57.2890672834, 692.1472919496), (43.0557340815, 702.822291851))
            Line((43.0557340815, 702.822291851), (38.8890674149, 702.822291851))
            Line((38.8890674149, 702.822291851), (58.2167408502, 688.3265367745))
            ThreePointArc((58.2167408502, 688.3265367745), (58.7132585878, 689.0023366299), (58.8890674149, 689.822291851))
            Line((58.8890674149, 689.822291851), (58.8890674149, 690.947291851))
            Line((58.8890674149, 690.947291851), (57.2890672834, 692.1472919496))
        make_face()
        with BuildLine():
            Line((23.0557340815, 717.822291851), (25.4557339533, 716.0222919472))
            ThreePointArc((25.4557339533, 716.0222919472), (25.1070508088, 717.1385196931), (26.0557340815, 717.822291851))
            Line((26.0557340815, 717.822291851), (23.0557340815, 717.822291851))
        make_face()
        with BuildLine():
            ThreePointArc((18.8890674149, 712.697291851), (19.4418537557, 713.5917190102), (20.4890673011, 713.4972919364))
            Line((20.4890673011, 713.4972919364), (18.8890674149, 714.697291851))
            Line((18.8890674149, 714.697291851), (18.8890674149, 712.697291851))
        make_face()
        with BuildLine():
            Line((58.8890674149, 690.947291851), (58.8890674149, 692.947291851))
            ThreePointArc((58.8890674149, 692.947291851), (58.3362809369, 692.0528646233), (57.2890672834, 692.1472919496))
            Line((57.2890672834, 692.1472919496), (58.8890674149, 690.947291851))
        make_face()
        with BuildLine():
            Line((54.7224007482, 687.822291851), (52.3224007859, 689.6222918227))
            ThreePointArc((52.3224007859, 689.6222918227), (52.6168279497, 689.2695054254), (52.7224007482, 688.822291851))
            ThreePointArc((52.7224007482, 688.822291851), (52.4295075294, 688.1151850699), (51.7224007482, 687.822291851))
            Line((51.7224007482, 687.822291851), (54.7224007482, 687.822291851))
        make_face()
        with BuildLine():
            ThreePointArc((-61.1109325851, 692.947291851), (-61.6637190078, 692.052864651), (-62.7109326177, 692.1472918754))
            Line((-62.7109326177, 692.1472918754), (-61.1109325851, 690.947291851))
            Line((-61.1109325851, 690.947291851), (-61.1109325851, 692.947291851))
        make_face()
        with BuildLine():
            Line((-101.1109325851, 714.697291851), (-101.1109325851, 712.697291851))
            ThreePointArc((-101.1109325851, 712.697291851), (-100.5581461919, 713.5917190364), (-99.5109326053, 713.4972918661))
            Line((-99.5109326053, 713.4972918661), (-101.1109325851, 714.697291851))
        make_face()
    extrude(amount=F1_DEPTH)


solid = f1.part
